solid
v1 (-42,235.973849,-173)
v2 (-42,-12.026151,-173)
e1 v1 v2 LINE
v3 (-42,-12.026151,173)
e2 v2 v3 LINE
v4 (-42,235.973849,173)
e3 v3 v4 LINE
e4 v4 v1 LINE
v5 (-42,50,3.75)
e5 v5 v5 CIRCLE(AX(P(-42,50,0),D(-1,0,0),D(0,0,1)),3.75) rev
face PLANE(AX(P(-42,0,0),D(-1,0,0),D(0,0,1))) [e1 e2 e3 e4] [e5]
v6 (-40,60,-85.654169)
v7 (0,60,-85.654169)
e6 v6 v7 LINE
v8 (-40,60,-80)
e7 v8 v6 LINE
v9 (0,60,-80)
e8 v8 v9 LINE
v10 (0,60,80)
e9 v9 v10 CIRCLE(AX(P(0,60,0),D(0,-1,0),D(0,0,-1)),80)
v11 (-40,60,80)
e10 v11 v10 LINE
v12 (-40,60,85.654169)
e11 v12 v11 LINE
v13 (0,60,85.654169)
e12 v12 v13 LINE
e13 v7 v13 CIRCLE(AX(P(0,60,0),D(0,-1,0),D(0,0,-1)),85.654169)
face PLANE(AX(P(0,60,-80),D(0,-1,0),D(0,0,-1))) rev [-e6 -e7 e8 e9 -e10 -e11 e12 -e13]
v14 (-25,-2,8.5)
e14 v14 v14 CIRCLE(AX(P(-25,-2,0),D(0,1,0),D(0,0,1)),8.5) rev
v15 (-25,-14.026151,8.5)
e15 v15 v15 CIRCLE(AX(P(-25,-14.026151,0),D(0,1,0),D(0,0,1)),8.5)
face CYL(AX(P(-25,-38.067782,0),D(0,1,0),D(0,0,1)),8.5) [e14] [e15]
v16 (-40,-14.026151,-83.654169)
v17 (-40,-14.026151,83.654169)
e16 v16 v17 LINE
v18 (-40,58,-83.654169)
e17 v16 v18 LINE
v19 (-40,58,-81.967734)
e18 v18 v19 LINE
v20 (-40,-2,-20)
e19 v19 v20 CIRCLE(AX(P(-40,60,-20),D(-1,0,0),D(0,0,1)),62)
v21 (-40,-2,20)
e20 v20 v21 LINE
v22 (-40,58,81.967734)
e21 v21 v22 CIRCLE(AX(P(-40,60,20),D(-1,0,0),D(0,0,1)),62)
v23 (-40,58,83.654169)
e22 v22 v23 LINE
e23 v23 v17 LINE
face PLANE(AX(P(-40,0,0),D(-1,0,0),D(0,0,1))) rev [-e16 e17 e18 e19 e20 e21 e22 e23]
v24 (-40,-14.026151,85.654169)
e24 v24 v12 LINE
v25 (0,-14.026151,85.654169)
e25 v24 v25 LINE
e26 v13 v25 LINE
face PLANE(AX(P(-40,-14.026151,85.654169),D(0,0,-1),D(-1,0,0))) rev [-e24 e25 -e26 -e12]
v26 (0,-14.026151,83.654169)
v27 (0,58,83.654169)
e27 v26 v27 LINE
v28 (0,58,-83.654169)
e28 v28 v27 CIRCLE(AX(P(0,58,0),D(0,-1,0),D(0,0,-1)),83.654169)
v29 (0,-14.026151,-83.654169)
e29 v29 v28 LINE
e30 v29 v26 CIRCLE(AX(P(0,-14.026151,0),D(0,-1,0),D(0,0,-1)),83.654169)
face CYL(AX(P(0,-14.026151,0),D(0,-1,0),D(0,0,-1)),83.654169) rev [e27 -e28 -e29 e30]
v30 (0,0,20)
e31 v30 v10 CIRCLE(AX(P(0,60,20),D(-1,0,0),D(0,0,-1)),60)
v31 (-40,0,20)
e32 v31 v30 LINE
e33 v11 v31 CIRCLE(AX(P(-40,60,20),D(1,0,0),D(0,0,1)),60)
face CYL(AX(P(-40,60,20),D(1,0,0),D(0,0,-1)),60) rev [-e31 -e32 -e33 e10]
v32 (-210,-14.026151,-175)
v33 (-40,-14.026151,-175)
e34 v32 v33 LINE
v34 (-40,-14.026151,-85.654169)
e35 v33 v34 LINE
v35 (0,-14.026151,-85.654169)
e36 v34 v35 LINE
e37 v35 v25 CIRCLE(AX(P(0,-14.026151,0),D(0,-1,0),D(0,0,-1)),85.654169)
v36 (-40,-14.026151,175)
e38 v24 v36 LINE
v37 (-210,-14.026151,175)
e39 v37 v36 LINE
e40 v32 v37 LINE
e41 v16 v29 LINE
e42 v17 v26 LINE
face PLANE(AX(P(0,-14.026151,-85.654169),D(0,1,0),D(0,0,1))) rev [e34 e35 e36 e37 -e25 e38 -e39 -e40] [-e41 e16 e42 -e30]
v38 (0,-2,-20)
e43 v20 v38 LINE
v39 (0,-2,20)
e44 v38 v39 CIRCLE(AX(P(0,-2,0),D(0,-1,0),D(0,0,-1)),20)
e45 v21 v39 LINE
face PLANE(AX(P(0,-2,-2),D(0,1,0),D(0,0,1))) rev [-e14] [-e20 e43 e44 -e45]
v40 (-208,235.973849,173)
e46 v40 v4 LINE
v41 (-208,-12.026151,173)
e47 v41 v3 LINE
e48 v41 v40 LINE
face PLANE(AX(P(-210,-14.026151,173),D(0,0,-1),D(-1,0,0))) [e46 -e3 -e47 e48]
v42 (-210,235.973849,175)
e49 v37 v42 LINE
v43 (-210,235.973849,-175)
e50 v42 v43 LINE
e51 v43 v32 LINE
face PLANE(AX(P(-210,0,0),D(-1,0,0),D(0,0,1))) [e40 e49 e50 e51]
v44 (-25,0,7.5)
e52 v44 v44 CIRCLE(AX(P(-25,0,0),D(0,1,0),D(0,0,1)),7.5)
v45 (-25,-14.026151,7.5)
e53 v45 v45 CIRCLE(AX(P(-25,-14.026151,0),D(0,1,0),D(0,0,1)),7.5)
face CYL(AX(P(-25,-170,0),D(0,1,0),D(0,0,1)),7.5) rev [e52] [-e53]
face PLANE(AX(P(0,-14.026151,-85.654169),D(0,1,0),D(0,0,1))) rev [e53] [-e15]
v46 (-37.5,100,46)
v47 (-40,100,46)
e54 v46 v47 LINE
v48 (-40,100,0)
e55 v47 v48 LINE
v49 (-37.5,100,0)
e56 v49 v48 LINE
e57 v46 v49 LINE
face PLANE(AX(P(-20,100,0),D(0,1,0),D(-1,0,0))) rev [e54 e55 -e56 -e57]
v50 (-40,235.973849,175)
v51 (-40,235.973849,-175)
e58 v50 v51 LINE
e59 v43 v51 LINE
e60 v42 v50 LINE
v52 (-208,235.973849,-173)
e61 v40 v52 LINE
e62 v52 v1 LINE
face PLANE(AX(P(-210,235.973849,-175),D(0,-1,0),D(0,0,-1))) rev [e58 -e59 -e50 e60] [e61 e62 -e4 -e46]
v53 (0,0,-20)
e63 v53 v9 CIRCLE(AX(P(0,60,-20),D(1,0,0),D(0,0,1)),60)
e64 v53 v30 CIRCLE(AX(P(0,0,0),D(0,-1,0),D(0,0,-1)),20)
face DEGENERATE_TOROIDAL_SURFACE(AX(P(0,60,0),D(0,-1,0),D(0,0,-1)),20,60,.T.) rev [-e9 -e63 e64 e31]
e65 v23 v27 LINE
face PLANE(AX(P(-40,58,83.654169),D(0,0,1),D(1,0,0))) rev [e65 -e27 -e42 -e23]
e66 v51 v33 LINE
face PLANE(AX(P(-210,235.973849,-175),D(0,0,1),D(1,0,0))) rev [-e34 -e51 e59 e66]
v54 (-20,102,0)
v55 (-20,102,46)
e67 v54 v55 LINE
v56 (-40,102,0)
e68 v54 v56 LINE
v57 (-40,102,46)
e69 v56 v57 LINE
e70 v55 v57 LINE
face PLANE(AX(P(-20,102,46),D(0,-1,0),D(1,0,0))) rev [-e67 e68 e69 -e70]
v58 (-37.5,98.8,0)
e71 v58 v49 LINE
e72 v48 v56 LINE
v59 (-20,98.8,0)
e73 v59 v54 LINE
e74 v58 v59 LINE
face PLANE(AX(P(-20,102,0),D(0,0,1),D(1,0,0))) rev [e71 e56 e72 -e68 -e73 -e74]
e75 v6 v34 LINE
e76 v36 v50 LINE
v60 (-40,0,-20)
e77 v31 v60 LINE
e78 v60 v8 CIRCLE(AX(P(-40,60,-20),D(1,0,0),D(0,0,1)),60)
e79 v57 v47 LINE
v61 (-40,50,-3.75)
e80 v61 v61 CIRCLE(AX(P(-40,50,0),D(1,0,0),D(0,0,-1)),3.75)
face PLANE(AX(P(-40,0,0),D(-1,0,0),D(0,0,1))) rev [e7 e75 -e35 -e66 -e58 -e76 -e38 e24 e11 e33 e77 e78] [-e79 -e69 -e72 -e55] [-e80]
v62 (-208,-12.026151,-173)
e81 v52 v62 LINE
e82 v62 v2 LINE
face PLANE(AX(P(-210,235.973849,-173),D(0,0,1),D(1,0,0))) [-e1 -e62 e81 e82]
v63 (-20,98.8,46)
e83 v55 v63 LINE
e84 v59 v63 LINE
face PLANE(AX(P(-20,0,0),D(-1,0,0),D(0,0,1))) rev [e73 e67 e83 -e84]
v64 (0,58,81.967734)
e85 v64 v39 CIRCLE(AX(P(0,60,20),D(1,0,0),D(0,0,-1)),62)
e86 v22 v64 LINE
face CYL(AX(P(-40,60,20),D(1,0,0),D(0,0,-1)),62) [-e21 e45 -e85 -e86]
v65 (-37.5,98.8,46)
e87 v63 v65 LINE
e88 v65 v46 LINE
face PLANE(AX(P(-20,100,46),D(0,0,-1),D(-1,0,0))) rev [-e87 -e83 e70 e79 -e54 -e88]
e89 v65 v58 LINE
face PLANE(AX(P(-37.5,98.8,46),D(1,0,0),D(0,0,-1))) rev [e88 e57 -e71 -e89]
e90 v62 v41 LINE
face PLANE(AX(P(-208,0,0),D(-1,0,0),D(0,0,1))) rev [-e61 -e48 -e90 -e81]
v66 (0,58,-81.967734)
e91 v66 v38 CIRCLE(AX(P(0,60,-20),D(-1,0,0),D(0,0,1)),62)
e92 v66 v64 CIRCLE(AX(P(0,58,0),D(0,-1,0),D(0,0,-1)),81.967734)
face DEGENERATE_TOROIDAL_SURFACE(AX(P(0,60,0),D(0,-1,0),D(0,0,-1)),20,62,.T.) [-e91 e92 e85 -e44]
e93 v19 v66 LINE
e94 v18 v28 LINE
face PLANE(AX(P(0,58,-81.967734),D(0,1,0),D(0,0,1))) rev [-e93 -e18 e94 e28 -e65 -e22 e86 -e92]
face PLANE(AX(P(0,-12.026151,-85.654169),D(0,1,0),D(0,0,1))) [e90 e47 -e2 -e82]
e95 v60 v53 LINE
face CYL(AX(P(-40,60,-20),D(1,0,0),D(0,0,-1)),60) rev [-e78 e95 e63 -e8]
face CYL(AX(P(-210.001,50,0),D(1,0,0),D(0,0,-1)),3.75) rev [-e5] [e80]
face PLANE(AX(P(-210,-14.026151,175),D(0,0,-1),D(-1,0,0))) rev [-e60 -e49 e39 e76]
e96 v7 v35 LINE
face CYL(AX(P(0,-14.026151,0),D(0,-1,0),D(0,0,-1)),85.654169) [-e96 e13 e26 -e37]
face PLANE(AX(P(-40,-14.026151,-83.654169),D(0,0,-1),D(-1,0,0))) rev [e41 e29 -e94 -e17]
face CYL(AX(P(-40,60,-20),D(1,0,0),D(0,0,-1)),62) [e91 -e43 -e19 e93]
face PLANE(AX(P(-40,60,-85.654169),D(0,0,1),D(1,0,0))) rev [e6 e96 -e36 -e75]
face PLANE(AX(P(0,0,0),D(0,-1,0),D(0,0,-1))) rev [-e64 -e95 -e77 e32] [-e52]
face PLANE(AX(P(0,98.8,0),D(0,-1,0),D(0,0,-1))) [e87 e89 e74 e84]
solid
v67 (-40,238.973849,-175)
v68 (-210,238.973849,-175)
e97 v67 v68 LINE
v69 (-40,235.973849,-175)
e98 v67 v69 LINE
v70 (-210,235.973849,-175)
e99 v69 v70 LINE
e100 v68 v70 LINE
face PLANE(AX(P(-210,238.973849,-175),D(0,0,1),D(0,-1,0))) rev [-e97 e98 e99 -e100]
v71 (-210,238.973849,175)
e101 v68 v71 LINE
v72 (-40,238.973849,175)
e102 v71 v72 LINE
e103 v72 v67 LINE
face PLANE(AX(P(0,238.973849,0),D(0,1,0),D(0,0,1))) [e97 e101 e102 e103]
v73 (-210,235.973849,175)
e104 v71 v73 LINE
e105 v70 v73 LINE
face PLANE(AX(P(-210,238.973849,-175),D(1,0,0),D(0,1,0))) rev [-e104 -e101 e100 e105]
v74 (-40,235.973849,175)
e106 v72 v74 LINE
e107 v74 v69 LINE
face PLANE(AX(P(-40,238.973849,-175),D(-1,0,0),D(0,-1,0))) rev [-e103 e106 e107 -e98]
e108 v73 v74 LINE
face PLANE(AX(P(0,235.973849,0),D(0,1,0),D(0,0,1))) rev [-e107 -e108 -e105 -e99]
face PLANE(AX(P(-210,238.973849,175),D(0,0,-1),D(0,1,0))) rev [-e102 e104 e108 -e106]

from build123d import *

# Parameters (mm, degrees)
REVOLU_O2_ANGLE           = 180
RESSALTO_EXTRUS_O1_DEPTH  = 40
ESBO_O3_W                 = 350
ESBO_O3_H                 = 250
RESSALTO_EXTRUS_O2_DEPTH  = 170
CASCA2_START              = -12.026151047
CASCA2_OUTLINE_W          = 166
CASCA2_OUTLINE_H          = 346
CASCA2_DEPTH              = 248
ESBO_O4_R                 = 7.5
CORTE_EXTRUS_O1_DEPTH     = 170
ESBO_O5_R                 = 8.5
ESBO_O5_R_2               = 7.5
RESSALTO_EXTRUS_O3_DEPTH  = 12.026151047
CORTE_EXTRUS_O3_REACH     = 341.424
ESBO_O6_R                 = 3.75
ESBO_O10_W                = 170
ESBO_O10_H                = 350
RESSALTO_EXTRUS_O13_DEPTH = 3
ESBO_O11_W                = 46
ESBO_O11_H                = 2
RESSALTO_EXTRUS_O15_DEPTH = 20
ESBO_O12_W                = 17.5
ESBO_O12_H                = 46
RESSALTO_EXTRUS_O17_DEPTH = 1.2


# Read off the part's stored shape, not the designer's step: Casca2
with BuildPart() as part:
    # Esboço1 → Revolução2 (revolve)
    with BuildSketch(Plane(origin=(0, 0, 0), x_dir=(0, 0, -1), z_dir=(1, 0, 0))):
        with BuildLine():
            Line((0, 0), (-20, 0))
            ThreePointArc((-20, 0), (-62.426406871, 17.573593129), (-80, 60))
            Line((-80, 60), (-85.654168524, 60))
            Line((-85.654168524, 60), (-85.654168524, -14.026151047))
            Line((-85.654168524, -14.026151047), (-83.654168524, -14.026151047))
            Line((-83.654168524, -14.026151047), (-83.654168524, 58))
            Line((-83.654168524, 58), (-81.967733539, 58))
            ThreePointArc((-81.967733539, 58), (-63.127717306, 15.457885097), (-20, -2))
            Line((-20, -2), (-2, -2))
            Line((-2, -2), (0, -2))
            Line((0, -2), (0, 0))
        make_face()
    revolve(axis=Axis((0, -14.026151047, 0), (0, 1, 0)), revolution_arc=REVOLU_O2_ANGLE)

    # Esboço2 → Ressalto-extrusão1 (add)
    with BuildSketch(Plane.ZY):
        with BuildLine():
            Line((-20, -2), (20, -2))
            ThreePointArc((20, -2), (63.127717306, 15.457885097), (81.967733539, 58))
            Line((81.967733539, 58), (83.654168524, 58))
            Line((83.654168524, 58), (83.654168524, -14.026151047))
            Line((83.654168524, -14.026151047), (85.654168524, -14.026151047))
            Line((85.654168524, -14.026151047), (85.654168524, 60))
            Line((85.654168524, 60), (80, 60))
            ThreePointArc((80, 60), (62.426406871, 17.573593129), (20, 0))
            Line((20, 0), (-20, 0))
            ThreePointArc((-20, 0), (-62.426406871, 17.573593129), (-80, 60))
            Line((-80, 60), (-85.654168524, 60))
            Line((-85.654168524, 60), (-85.654168524, -14.026151047))
            Line((-85.654168524, -14.026151047), (-83.654168524, -14.026151047))
            Line((-83.654168524, -14.026151047), (-83.654168524, 58))
            Line((-83.654168524, 58), (-81.967733539, 58))
            ThreePointArc((-81.967733539, 58), (-63.127717306, 15.457885097), (-20, -2))
        make_face()
    extrude(amount=RESSALTO_EXTRUS_O1_DEPTH)

    # Esboço3 → Ressalto-extrusão2 (add)
    with BuildSketch(Plane.ZY.offset(40)):
        with Locations((0, 110.973848953)):
            Rectangle(ESBO_O3_W, ESBO_O3_H)
    extrude(amount=RESSALTO_EXTRUS_O2_DEPTH)

    # Casca2 outline → Casca2 (cut)
    with BuildSketch(Plane(origin=(0, 0, 0), x_dir=(1, 0, 0), z_dir=(0, 1, 0)).offset(CASCA2_START)):
        with Locations((-125, 0)):
            Rectangle(CASCA2_OUTLINE_W, CASCA2_OUTLINE_H)
    extrude(amount=CASCA2_DEPTH, mode=Mode.SUBTRACT)

    # Esboço4 → Corte-extrusão1 (cut)
    with BuildSketch(Plane(origin=(0, 0, 0), x_dir=(1, 0, 0), z_dir=(0, 1, 0))):
        with Locations(Location((-25, 0, 0), (0, 0, 270))):
            Circle(ESBO_O4_R)
    extrude(amount=-CORTE_EXTRUS_O1_DEPTH, mode=Mode.SUBTRACT)

    # Esboço5 → Ressalto-extrusão3 (add)
    with BuildSketch(Plane.XZ.offset(2)):
        with Locations(Location((-25, 0, 0), (0, 0, 90))):
            Circle(ESBO_O5_R)
        with Locations(Location((-25, 0, 0), (0, 0, 90))):
            Circle(ESBO_O5_R_2, mode=Mode.SUBTRACT)
    extrude(amount=RESSALTO_EXTRUS_O3_DEPTH)

    # Esboço6 → Corte-extrusão3 (cut, up to next)
    with BuildSketch(Plane(origin=(-40, 0, 0), x_dir=(0, 0, -1), z_dir=(1, 0, 0)), mode=Mode.PRIVATE) as corte_extrus_o3_sk1:
        with Locations((0, 50)):
            Circle(ESBO_O6_R)
    corte_extrus_o3_tool1 = extrude(corte_extrus_o3_sk1.sketch, amount=-CORTE_EXTRUS_O3_REACH, mode=Mode.PRIVATE) & part.part
    add(corte_extrus_o3_tool1.solids().sort_by_distance((-40, 50, 0))[0], mode=Mode.SUBTRACT)

    # Esboço11 → Ressalto-extrusão15 (add)
    with BuildSketch(Plane(origin=(-40, 0, 0), x_dir=(0, 0, -1), z_dir=(1, 0, 0))):
        with Locations((-23, 101)):
            Rectangle(ESBO_O11_W, ESBO_O11_H)
    extrude(amount=RESSALTO_EXTRUS_O15_DEPTH)

    # Esboço12 → Ressalto-extrusão17 (add)
    with BuildSketch(Plane.XZ.offset(-100)):
        with Locations((-28.75, 23)):
            Rectangle(ESBO_O12_W, ESBO_O12_H)
    extrude(amount=RESSALTO_EXTRUS_O17_DEPTH)


with BuildPart() as body_2:
    # Esboço10 → Ressalto-extrusão13 (new body)
    with BuildSketch(Plane(origin=(0, 235.973848953, 0), x_dir=(1, 0, 0), z_dir=(0, 1, 0))):
        with Locations((-125, 0)):
            Rectangle(ESBO_O10_W, ESBO_O10_H)
    extrude(amount=RESSALTO_EXTRUS_O13_DEPTH)


solid = Compound([part.part, body_2.part])
